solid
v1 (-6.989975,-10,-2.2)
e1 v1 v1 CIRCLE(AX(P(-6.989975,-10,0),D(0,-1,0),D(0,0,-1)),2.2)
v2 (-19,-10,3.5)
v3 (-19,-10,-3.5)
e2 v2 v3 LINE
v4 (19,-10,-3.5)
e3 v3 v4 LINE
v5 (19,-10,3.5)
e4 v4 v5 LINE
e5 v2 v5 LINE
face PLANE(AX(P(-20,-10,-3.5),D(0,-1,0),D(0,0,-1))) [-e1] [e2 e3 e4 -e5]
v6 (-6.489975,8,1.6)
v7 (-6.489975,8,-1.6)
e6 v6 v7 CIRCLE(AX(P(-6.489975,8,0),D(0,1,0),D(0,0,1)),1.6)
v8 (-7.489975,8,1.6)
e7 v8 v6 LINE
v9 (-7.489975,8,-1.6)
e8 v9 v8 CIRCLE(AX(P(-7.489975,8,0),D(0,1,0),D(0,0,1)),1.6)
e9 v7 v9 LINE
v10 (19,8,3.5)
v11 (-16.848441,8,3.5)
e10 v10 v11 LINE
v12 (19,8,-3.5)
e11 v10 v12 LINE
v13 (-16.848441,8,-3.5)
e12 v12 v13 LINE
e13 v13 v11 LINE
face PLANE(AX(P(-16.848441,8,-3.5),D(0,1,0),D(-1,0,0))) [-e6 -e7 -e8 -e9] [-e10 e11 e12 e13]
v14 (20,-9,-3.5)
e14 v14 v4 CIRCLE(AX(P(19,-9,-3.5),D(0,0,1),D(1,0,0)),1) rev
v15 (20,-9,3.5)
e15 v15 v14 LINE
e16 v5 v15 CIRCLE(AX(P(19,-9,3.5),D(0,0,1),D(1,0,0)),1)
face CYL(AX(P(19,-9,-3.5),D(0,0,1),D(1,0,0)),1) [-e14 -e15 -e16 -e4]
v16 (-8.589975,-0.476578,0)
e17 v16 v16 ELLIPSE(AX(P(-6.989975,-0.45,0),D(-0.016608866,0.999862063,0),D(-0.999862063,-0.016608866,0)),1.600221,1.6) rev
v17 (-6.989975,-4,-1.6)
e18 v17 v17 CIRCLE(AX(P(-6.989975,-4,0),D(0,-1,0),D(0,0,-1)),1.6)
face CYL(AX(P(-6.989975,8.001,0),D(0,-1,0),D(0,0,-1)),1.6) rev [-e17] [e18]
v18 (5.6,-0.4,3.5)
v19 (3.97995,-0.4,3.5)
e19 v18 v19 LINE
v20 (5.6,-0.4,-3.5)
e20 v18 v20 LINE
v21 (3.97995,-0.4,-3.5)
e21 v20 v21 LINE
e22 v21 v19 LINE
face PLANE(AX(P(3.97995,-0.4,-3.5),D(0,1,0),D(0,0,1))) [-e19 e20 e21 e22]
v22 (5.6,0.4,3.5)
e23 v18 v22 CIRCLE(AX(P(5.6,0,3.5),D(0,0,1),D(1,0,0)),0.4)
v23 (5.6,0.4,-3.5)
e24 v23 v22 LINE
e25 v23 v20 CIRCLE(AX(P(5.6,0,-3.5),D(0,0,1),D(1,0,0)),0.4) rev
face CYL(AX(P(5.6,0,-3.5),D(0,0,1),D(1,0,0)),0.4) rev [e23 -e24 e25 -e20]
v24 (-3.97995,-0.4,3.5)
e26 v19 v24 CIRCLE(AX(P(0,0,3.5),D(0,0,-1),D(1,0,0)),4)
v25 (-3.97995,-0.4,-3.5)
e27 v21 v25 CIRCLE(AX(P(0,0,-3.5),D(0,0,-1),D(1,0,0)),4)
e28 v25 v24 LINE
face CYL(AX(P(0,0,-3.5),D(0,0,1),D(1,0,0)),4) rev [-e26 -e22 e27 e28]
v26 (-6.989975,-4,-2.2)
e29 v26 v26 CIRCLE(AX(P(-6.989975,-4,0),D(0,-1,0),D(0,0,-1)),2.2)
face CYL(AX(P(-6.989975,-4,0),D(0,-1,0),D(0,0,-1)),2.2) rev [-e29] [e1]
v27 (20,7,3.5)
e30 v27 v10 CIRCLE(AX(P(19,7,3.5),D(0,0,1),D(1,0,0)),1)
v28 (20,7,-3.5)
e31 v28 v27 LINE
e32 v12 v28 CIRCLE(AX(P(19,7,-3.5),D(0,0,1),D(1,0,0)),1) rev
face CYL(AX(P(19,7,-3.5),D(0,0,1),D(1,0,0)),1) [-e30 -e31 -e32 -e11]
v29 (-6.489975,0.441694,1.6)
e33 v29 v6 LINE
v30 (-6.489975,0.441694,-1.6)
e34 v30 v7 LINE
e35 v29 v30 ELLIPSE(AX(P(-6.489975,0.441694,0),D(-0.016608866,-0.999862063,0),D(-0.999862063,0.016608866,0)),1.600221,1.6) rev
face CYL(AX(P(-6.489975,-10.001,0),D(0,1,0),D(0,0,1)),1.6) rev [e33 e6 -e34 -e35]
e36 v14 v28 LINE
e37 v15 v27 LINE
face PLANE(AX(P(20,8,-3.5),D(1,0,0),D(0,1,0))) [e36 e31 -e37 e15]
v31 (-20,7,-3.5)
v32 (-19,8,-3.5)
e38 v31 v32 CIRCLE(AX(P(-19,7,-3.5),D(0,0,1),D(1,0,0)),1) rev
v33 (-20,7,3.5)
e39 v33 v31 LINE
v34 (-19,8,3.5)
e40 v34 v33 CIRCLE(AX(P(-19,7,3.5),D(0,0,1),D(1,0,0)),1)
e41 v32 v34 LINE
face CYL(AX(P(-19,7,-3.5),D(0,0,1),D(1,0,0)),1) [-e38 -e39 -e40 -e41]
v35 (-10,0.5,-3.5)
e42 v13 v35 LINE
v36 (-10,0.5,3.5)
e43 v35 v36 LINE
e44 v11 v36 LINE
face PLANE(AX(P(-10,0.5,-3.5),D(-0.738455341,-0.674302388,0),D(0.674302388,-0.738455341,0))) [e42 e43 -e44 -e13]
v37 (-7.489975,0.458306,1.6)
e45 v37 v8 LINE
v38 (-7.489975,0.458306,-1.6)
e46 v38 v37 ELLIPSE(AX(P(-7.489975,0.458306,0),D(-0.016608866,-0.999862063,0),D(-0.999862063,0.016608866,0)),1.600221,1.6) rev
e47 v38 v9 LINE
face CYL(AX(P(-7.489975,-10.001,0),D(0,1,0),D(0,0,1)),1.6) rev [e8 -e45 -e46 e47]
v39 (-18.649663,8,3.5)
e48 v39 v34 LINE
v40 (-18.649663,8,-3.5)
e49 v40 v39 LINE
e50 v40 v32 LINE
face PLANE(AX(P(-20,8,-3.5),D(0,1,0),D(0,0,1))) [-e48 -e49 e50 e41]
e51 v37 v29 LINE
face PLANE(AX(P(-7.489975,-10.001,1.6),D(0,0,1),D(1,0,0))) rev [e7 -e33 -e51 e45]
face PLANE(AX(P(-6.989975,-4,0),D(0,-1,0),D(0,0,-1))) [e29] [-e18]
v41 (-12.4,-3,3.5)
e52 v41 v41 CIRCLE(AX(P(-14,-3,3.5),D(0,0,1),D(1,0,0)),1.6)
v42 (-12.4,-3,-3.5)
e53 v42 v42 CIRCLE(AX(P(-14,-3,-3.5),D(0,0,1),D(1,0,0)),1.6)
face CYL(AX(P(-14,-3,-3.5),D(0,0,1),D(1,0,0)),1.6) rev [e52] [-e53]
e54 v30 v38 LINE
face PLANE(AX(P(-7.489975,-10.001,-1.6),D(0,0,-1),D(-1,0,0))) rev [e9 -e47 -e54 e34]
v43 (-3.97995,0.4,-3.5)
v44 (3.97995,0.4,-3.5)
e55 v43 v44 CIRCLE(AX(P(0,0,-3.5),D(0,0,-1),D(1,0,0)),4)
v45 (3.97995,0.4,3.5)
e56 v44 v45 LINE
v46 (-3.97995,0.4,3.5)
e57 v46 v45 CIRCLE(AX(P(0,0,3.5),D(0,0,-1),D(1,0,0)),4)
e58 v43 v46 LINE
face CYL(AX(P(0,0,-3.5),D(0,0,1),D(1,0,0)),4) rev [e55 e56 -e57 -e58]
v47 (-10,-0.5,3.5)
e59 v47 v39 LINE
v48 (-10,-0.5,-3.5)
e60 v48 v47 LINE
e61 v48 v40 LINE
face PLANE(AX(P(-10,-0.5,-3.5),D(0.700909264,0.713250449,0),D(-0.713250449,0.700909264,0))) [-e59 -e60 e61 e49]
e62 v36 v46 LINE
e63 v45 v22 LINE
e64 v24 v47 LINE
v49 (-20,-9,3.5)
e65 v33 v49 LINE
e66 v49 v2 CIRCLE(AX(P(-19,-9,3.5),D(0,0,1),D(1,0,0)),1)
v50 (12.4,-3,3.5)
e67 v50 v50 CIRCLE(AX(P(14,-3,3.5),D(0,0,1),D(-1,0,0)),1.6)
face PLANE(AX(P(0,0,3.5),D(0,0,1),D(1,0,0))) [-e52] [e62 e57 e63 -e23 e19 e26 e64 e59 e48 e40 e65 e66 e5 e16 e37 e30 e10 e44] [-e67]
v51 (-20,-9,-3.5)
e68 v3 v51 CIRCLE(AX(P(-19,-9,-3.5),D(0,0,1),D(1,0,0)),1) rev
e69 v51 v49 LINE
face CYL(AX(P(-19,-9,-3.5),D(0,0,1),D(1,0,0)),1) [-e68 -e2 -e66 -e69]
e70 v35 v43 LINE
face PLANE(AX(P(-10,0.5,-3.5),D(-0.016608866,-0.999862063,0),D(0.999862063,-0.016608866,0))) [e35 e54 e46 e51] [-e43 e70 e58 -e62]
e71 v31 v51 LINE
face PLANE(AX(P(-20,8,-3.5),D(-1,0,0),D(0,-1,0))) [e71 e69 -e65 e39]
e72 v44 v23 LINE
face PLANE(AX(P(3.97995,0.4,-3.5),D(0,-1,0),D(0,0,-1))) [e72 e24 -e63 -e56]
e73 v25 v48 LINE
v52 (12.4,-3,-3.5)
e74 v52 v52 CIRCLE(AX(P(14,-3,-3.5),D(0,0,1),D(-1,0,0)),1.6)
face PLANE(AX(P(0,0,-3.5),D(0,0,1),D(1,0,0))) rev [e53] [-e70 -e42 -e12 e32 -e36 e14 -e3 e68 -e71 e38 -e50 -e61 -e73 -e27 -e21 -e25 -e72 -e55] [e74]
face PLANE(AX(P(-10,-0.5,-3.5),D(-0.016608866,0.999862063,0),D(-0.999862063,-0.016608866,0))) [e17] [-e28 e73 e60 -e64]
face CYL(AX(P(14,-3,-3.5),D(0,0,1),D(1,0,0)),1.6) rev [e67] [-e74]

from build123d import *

# Parameters (mm, degrees)
BOSS_EXTRUDE1_DEPTH      = 3.5
BOSS_EXTRUDE1_DEPTH_BACK = 3.5
SKETCH1_R                = 1.6
CUT_EXTRUDE1_REACH       = 29.134
SKETCH3_R                = 1.6
SKETCH3_3_R              = 2.2
SKETCH3_3_R_2            = 1.6
CUT_EXTRUDE2_DEPTH       = 6
CUT_EXTRUDE3_REACH       = 29.134
FILLET1_R                = 1
FILLET2_R                = 0.4


with BuildPart() as part:
    # Sketch1 → Boss-Extrude1 (new, two sides: drawn at the far end of the back side and taken through both)
    with BuildSketch(Plane.XY.offset(-BOSS_EXTRUDE1_DEPTH_BACK)):
        with BuildLine():
            Line((-20, 8), (-18.64966284, 8))
            Line((-18.64966284, 8), (-10, -0.5))
            Line((-10, -0.5), (-3.979949748, -0.4))
            ThreePointArc((-3.979949748, -0.4), (0, -4), (3.979949748, -0.4))
            Line((3.979949748, -0.4), (6, -0.4))
            Line((6, -0.4), (6, 0.4))
            Line((6, 0.4), (3.979949748, 0.4))
            ThreePointArc((3.979949748, 0.4), (0, 4), (-3.979949748, 0.4))
            Line((-3.979949748, 0.4), (-10, 0.5))
            Line((-10, 0.5), (-16.848441102, 8))
            Line((-16.848441102, 8), (20, 8))
            Line((20, 8), (20, -10))
            Line((20, -10), (-20, -10))
            Line((-20, -10), (-20, 8))
        make_face()
        with Locations((-14, -3)):
            Circle(SKETCH1_R, mode=Mode.SUBTRACT)
        with Locations(Location((14, -3, 0), (0, 0, 180))):
            Circle(SKETCH1_R, mode=Mode.SUBTRACT)
    extrude(amount=BOSS_EXTRUDE1_DEPTH + BOSS_EXTRUDE1_DEPTH_BACK)

    # Cut-Extrude1: up to this plane
    cut_extrude1_end = Plane(origin=(-10, -0.5, -3.5), z_dir=(-0.016608865731892127, 0.9998620632762801, 0))
    # Sketch3 → Cut-Extrude1 (cut, up to the surface)
    with BuildSketch(Plane.XZ.offset(10), mode=Mode.PRIVATE) as cut_extrude1_sk1:
        with Locations(Location((-6.989974874, 0, 0), (0, 0, 270))):
            Circle(SKETCH3_R)
    cut_extrude1_tool1 = split(extrude(cut_extrude1_sk1.sketch, amount=-CUT_EXTRUDE1_REACH, mode=Mode.PRIVATE), bisect_by=cut_extrude1_end, keep=Keep.BOTH, mode=Mode.PRIVATE)
    add(cut_extrude1_tool1.solids().sort_by_distance((-6.989975, -10, 0))[0], mode=Mode.SUBTRACT)

    # Sketch3<3> → Cut-Extrude2 (cut)
    with BuildSketch(Plane.XZ.offset(10)):
        with Locations(Location((-6.989974874, 0, 0), (0, 0, 270))):
            Circle(SKETCH3_3_R)
        with Locations(Location((-6.989974874, 0, 0), (0, 0, 270))):
            Circle(SKETCH3_3_R_2, mode=Mode.SUBTRACT)
    extrude(amount=-CUT_EXTRUDE2_DEPTH, mode=Mode.SUBTRACT)

    # Cut-Extrude3: up to this plane
    cut_extrude3_end = Plane(origin=(-10, 0.5, -3.5), z_dir=(-0.016608865731892127, -0.9998620632762801, 0))
    # Sketch4 → Cut-Extrude3 (cut, up to the surface)
    with BuildSketch(Plane(origin=(0, 8, 0), x_dir=(1, 0, 0), z_dir=(0, 1, 0)), mode=Mode.PRIVATE) as cut_extrude3_sk1:
        with BuildLine():
            Line((-7.489974874, 1.6), (-6.489974874, 1.6))
            ThreePointArc((-6.489974874, 1.6), (-4.889974874, 0), (-6.489974874, -1.6))
            Line((-6.489974874, -1.6), (-7.489974874, -1.6))
            ThreePointArc((-7.489974874, -1.6), (-9.089974874, 0), (-7.489974874, 1.6))
        make_face()
    cut_extrude3_tool1 = split(extrude(cut_extrude3_sk1.sketch, amount=-CUT_EXTRUDE3_REACH, mode=Mode.PRIVATE), bisect_by=cut_extrude3_end, keep=Keep.BOTH, mode=Mode.PRIVATE)
    add(cut_extrude3_tool1.solids().sort_by_distance((-6.989975, 8, 0))[0], mode=Mode.SUBTRACT)

    # Fillet1
    fillet1_edges = [part.edges().sort_by_distance(p)[0] for p in [
        (20, 8, 0),
        (20, -10, 0),
        (-20, -10, 0),
        (-20, 8, 0),
    ]]
    fillet(fillet1_edges, radius=FILLET1_R)

    # Fillet2
    fillet2_edges = [part.edges().sort_by_distance(p)[0] for p in [
        (6, -0.4, 0),
        (6, 0.4, 0),
    ]]
    fillet(fillet2_edges, radius=FILLET2_R - 0.0001)  # a hair under: the kernel refuses the full size


solid = part.part
